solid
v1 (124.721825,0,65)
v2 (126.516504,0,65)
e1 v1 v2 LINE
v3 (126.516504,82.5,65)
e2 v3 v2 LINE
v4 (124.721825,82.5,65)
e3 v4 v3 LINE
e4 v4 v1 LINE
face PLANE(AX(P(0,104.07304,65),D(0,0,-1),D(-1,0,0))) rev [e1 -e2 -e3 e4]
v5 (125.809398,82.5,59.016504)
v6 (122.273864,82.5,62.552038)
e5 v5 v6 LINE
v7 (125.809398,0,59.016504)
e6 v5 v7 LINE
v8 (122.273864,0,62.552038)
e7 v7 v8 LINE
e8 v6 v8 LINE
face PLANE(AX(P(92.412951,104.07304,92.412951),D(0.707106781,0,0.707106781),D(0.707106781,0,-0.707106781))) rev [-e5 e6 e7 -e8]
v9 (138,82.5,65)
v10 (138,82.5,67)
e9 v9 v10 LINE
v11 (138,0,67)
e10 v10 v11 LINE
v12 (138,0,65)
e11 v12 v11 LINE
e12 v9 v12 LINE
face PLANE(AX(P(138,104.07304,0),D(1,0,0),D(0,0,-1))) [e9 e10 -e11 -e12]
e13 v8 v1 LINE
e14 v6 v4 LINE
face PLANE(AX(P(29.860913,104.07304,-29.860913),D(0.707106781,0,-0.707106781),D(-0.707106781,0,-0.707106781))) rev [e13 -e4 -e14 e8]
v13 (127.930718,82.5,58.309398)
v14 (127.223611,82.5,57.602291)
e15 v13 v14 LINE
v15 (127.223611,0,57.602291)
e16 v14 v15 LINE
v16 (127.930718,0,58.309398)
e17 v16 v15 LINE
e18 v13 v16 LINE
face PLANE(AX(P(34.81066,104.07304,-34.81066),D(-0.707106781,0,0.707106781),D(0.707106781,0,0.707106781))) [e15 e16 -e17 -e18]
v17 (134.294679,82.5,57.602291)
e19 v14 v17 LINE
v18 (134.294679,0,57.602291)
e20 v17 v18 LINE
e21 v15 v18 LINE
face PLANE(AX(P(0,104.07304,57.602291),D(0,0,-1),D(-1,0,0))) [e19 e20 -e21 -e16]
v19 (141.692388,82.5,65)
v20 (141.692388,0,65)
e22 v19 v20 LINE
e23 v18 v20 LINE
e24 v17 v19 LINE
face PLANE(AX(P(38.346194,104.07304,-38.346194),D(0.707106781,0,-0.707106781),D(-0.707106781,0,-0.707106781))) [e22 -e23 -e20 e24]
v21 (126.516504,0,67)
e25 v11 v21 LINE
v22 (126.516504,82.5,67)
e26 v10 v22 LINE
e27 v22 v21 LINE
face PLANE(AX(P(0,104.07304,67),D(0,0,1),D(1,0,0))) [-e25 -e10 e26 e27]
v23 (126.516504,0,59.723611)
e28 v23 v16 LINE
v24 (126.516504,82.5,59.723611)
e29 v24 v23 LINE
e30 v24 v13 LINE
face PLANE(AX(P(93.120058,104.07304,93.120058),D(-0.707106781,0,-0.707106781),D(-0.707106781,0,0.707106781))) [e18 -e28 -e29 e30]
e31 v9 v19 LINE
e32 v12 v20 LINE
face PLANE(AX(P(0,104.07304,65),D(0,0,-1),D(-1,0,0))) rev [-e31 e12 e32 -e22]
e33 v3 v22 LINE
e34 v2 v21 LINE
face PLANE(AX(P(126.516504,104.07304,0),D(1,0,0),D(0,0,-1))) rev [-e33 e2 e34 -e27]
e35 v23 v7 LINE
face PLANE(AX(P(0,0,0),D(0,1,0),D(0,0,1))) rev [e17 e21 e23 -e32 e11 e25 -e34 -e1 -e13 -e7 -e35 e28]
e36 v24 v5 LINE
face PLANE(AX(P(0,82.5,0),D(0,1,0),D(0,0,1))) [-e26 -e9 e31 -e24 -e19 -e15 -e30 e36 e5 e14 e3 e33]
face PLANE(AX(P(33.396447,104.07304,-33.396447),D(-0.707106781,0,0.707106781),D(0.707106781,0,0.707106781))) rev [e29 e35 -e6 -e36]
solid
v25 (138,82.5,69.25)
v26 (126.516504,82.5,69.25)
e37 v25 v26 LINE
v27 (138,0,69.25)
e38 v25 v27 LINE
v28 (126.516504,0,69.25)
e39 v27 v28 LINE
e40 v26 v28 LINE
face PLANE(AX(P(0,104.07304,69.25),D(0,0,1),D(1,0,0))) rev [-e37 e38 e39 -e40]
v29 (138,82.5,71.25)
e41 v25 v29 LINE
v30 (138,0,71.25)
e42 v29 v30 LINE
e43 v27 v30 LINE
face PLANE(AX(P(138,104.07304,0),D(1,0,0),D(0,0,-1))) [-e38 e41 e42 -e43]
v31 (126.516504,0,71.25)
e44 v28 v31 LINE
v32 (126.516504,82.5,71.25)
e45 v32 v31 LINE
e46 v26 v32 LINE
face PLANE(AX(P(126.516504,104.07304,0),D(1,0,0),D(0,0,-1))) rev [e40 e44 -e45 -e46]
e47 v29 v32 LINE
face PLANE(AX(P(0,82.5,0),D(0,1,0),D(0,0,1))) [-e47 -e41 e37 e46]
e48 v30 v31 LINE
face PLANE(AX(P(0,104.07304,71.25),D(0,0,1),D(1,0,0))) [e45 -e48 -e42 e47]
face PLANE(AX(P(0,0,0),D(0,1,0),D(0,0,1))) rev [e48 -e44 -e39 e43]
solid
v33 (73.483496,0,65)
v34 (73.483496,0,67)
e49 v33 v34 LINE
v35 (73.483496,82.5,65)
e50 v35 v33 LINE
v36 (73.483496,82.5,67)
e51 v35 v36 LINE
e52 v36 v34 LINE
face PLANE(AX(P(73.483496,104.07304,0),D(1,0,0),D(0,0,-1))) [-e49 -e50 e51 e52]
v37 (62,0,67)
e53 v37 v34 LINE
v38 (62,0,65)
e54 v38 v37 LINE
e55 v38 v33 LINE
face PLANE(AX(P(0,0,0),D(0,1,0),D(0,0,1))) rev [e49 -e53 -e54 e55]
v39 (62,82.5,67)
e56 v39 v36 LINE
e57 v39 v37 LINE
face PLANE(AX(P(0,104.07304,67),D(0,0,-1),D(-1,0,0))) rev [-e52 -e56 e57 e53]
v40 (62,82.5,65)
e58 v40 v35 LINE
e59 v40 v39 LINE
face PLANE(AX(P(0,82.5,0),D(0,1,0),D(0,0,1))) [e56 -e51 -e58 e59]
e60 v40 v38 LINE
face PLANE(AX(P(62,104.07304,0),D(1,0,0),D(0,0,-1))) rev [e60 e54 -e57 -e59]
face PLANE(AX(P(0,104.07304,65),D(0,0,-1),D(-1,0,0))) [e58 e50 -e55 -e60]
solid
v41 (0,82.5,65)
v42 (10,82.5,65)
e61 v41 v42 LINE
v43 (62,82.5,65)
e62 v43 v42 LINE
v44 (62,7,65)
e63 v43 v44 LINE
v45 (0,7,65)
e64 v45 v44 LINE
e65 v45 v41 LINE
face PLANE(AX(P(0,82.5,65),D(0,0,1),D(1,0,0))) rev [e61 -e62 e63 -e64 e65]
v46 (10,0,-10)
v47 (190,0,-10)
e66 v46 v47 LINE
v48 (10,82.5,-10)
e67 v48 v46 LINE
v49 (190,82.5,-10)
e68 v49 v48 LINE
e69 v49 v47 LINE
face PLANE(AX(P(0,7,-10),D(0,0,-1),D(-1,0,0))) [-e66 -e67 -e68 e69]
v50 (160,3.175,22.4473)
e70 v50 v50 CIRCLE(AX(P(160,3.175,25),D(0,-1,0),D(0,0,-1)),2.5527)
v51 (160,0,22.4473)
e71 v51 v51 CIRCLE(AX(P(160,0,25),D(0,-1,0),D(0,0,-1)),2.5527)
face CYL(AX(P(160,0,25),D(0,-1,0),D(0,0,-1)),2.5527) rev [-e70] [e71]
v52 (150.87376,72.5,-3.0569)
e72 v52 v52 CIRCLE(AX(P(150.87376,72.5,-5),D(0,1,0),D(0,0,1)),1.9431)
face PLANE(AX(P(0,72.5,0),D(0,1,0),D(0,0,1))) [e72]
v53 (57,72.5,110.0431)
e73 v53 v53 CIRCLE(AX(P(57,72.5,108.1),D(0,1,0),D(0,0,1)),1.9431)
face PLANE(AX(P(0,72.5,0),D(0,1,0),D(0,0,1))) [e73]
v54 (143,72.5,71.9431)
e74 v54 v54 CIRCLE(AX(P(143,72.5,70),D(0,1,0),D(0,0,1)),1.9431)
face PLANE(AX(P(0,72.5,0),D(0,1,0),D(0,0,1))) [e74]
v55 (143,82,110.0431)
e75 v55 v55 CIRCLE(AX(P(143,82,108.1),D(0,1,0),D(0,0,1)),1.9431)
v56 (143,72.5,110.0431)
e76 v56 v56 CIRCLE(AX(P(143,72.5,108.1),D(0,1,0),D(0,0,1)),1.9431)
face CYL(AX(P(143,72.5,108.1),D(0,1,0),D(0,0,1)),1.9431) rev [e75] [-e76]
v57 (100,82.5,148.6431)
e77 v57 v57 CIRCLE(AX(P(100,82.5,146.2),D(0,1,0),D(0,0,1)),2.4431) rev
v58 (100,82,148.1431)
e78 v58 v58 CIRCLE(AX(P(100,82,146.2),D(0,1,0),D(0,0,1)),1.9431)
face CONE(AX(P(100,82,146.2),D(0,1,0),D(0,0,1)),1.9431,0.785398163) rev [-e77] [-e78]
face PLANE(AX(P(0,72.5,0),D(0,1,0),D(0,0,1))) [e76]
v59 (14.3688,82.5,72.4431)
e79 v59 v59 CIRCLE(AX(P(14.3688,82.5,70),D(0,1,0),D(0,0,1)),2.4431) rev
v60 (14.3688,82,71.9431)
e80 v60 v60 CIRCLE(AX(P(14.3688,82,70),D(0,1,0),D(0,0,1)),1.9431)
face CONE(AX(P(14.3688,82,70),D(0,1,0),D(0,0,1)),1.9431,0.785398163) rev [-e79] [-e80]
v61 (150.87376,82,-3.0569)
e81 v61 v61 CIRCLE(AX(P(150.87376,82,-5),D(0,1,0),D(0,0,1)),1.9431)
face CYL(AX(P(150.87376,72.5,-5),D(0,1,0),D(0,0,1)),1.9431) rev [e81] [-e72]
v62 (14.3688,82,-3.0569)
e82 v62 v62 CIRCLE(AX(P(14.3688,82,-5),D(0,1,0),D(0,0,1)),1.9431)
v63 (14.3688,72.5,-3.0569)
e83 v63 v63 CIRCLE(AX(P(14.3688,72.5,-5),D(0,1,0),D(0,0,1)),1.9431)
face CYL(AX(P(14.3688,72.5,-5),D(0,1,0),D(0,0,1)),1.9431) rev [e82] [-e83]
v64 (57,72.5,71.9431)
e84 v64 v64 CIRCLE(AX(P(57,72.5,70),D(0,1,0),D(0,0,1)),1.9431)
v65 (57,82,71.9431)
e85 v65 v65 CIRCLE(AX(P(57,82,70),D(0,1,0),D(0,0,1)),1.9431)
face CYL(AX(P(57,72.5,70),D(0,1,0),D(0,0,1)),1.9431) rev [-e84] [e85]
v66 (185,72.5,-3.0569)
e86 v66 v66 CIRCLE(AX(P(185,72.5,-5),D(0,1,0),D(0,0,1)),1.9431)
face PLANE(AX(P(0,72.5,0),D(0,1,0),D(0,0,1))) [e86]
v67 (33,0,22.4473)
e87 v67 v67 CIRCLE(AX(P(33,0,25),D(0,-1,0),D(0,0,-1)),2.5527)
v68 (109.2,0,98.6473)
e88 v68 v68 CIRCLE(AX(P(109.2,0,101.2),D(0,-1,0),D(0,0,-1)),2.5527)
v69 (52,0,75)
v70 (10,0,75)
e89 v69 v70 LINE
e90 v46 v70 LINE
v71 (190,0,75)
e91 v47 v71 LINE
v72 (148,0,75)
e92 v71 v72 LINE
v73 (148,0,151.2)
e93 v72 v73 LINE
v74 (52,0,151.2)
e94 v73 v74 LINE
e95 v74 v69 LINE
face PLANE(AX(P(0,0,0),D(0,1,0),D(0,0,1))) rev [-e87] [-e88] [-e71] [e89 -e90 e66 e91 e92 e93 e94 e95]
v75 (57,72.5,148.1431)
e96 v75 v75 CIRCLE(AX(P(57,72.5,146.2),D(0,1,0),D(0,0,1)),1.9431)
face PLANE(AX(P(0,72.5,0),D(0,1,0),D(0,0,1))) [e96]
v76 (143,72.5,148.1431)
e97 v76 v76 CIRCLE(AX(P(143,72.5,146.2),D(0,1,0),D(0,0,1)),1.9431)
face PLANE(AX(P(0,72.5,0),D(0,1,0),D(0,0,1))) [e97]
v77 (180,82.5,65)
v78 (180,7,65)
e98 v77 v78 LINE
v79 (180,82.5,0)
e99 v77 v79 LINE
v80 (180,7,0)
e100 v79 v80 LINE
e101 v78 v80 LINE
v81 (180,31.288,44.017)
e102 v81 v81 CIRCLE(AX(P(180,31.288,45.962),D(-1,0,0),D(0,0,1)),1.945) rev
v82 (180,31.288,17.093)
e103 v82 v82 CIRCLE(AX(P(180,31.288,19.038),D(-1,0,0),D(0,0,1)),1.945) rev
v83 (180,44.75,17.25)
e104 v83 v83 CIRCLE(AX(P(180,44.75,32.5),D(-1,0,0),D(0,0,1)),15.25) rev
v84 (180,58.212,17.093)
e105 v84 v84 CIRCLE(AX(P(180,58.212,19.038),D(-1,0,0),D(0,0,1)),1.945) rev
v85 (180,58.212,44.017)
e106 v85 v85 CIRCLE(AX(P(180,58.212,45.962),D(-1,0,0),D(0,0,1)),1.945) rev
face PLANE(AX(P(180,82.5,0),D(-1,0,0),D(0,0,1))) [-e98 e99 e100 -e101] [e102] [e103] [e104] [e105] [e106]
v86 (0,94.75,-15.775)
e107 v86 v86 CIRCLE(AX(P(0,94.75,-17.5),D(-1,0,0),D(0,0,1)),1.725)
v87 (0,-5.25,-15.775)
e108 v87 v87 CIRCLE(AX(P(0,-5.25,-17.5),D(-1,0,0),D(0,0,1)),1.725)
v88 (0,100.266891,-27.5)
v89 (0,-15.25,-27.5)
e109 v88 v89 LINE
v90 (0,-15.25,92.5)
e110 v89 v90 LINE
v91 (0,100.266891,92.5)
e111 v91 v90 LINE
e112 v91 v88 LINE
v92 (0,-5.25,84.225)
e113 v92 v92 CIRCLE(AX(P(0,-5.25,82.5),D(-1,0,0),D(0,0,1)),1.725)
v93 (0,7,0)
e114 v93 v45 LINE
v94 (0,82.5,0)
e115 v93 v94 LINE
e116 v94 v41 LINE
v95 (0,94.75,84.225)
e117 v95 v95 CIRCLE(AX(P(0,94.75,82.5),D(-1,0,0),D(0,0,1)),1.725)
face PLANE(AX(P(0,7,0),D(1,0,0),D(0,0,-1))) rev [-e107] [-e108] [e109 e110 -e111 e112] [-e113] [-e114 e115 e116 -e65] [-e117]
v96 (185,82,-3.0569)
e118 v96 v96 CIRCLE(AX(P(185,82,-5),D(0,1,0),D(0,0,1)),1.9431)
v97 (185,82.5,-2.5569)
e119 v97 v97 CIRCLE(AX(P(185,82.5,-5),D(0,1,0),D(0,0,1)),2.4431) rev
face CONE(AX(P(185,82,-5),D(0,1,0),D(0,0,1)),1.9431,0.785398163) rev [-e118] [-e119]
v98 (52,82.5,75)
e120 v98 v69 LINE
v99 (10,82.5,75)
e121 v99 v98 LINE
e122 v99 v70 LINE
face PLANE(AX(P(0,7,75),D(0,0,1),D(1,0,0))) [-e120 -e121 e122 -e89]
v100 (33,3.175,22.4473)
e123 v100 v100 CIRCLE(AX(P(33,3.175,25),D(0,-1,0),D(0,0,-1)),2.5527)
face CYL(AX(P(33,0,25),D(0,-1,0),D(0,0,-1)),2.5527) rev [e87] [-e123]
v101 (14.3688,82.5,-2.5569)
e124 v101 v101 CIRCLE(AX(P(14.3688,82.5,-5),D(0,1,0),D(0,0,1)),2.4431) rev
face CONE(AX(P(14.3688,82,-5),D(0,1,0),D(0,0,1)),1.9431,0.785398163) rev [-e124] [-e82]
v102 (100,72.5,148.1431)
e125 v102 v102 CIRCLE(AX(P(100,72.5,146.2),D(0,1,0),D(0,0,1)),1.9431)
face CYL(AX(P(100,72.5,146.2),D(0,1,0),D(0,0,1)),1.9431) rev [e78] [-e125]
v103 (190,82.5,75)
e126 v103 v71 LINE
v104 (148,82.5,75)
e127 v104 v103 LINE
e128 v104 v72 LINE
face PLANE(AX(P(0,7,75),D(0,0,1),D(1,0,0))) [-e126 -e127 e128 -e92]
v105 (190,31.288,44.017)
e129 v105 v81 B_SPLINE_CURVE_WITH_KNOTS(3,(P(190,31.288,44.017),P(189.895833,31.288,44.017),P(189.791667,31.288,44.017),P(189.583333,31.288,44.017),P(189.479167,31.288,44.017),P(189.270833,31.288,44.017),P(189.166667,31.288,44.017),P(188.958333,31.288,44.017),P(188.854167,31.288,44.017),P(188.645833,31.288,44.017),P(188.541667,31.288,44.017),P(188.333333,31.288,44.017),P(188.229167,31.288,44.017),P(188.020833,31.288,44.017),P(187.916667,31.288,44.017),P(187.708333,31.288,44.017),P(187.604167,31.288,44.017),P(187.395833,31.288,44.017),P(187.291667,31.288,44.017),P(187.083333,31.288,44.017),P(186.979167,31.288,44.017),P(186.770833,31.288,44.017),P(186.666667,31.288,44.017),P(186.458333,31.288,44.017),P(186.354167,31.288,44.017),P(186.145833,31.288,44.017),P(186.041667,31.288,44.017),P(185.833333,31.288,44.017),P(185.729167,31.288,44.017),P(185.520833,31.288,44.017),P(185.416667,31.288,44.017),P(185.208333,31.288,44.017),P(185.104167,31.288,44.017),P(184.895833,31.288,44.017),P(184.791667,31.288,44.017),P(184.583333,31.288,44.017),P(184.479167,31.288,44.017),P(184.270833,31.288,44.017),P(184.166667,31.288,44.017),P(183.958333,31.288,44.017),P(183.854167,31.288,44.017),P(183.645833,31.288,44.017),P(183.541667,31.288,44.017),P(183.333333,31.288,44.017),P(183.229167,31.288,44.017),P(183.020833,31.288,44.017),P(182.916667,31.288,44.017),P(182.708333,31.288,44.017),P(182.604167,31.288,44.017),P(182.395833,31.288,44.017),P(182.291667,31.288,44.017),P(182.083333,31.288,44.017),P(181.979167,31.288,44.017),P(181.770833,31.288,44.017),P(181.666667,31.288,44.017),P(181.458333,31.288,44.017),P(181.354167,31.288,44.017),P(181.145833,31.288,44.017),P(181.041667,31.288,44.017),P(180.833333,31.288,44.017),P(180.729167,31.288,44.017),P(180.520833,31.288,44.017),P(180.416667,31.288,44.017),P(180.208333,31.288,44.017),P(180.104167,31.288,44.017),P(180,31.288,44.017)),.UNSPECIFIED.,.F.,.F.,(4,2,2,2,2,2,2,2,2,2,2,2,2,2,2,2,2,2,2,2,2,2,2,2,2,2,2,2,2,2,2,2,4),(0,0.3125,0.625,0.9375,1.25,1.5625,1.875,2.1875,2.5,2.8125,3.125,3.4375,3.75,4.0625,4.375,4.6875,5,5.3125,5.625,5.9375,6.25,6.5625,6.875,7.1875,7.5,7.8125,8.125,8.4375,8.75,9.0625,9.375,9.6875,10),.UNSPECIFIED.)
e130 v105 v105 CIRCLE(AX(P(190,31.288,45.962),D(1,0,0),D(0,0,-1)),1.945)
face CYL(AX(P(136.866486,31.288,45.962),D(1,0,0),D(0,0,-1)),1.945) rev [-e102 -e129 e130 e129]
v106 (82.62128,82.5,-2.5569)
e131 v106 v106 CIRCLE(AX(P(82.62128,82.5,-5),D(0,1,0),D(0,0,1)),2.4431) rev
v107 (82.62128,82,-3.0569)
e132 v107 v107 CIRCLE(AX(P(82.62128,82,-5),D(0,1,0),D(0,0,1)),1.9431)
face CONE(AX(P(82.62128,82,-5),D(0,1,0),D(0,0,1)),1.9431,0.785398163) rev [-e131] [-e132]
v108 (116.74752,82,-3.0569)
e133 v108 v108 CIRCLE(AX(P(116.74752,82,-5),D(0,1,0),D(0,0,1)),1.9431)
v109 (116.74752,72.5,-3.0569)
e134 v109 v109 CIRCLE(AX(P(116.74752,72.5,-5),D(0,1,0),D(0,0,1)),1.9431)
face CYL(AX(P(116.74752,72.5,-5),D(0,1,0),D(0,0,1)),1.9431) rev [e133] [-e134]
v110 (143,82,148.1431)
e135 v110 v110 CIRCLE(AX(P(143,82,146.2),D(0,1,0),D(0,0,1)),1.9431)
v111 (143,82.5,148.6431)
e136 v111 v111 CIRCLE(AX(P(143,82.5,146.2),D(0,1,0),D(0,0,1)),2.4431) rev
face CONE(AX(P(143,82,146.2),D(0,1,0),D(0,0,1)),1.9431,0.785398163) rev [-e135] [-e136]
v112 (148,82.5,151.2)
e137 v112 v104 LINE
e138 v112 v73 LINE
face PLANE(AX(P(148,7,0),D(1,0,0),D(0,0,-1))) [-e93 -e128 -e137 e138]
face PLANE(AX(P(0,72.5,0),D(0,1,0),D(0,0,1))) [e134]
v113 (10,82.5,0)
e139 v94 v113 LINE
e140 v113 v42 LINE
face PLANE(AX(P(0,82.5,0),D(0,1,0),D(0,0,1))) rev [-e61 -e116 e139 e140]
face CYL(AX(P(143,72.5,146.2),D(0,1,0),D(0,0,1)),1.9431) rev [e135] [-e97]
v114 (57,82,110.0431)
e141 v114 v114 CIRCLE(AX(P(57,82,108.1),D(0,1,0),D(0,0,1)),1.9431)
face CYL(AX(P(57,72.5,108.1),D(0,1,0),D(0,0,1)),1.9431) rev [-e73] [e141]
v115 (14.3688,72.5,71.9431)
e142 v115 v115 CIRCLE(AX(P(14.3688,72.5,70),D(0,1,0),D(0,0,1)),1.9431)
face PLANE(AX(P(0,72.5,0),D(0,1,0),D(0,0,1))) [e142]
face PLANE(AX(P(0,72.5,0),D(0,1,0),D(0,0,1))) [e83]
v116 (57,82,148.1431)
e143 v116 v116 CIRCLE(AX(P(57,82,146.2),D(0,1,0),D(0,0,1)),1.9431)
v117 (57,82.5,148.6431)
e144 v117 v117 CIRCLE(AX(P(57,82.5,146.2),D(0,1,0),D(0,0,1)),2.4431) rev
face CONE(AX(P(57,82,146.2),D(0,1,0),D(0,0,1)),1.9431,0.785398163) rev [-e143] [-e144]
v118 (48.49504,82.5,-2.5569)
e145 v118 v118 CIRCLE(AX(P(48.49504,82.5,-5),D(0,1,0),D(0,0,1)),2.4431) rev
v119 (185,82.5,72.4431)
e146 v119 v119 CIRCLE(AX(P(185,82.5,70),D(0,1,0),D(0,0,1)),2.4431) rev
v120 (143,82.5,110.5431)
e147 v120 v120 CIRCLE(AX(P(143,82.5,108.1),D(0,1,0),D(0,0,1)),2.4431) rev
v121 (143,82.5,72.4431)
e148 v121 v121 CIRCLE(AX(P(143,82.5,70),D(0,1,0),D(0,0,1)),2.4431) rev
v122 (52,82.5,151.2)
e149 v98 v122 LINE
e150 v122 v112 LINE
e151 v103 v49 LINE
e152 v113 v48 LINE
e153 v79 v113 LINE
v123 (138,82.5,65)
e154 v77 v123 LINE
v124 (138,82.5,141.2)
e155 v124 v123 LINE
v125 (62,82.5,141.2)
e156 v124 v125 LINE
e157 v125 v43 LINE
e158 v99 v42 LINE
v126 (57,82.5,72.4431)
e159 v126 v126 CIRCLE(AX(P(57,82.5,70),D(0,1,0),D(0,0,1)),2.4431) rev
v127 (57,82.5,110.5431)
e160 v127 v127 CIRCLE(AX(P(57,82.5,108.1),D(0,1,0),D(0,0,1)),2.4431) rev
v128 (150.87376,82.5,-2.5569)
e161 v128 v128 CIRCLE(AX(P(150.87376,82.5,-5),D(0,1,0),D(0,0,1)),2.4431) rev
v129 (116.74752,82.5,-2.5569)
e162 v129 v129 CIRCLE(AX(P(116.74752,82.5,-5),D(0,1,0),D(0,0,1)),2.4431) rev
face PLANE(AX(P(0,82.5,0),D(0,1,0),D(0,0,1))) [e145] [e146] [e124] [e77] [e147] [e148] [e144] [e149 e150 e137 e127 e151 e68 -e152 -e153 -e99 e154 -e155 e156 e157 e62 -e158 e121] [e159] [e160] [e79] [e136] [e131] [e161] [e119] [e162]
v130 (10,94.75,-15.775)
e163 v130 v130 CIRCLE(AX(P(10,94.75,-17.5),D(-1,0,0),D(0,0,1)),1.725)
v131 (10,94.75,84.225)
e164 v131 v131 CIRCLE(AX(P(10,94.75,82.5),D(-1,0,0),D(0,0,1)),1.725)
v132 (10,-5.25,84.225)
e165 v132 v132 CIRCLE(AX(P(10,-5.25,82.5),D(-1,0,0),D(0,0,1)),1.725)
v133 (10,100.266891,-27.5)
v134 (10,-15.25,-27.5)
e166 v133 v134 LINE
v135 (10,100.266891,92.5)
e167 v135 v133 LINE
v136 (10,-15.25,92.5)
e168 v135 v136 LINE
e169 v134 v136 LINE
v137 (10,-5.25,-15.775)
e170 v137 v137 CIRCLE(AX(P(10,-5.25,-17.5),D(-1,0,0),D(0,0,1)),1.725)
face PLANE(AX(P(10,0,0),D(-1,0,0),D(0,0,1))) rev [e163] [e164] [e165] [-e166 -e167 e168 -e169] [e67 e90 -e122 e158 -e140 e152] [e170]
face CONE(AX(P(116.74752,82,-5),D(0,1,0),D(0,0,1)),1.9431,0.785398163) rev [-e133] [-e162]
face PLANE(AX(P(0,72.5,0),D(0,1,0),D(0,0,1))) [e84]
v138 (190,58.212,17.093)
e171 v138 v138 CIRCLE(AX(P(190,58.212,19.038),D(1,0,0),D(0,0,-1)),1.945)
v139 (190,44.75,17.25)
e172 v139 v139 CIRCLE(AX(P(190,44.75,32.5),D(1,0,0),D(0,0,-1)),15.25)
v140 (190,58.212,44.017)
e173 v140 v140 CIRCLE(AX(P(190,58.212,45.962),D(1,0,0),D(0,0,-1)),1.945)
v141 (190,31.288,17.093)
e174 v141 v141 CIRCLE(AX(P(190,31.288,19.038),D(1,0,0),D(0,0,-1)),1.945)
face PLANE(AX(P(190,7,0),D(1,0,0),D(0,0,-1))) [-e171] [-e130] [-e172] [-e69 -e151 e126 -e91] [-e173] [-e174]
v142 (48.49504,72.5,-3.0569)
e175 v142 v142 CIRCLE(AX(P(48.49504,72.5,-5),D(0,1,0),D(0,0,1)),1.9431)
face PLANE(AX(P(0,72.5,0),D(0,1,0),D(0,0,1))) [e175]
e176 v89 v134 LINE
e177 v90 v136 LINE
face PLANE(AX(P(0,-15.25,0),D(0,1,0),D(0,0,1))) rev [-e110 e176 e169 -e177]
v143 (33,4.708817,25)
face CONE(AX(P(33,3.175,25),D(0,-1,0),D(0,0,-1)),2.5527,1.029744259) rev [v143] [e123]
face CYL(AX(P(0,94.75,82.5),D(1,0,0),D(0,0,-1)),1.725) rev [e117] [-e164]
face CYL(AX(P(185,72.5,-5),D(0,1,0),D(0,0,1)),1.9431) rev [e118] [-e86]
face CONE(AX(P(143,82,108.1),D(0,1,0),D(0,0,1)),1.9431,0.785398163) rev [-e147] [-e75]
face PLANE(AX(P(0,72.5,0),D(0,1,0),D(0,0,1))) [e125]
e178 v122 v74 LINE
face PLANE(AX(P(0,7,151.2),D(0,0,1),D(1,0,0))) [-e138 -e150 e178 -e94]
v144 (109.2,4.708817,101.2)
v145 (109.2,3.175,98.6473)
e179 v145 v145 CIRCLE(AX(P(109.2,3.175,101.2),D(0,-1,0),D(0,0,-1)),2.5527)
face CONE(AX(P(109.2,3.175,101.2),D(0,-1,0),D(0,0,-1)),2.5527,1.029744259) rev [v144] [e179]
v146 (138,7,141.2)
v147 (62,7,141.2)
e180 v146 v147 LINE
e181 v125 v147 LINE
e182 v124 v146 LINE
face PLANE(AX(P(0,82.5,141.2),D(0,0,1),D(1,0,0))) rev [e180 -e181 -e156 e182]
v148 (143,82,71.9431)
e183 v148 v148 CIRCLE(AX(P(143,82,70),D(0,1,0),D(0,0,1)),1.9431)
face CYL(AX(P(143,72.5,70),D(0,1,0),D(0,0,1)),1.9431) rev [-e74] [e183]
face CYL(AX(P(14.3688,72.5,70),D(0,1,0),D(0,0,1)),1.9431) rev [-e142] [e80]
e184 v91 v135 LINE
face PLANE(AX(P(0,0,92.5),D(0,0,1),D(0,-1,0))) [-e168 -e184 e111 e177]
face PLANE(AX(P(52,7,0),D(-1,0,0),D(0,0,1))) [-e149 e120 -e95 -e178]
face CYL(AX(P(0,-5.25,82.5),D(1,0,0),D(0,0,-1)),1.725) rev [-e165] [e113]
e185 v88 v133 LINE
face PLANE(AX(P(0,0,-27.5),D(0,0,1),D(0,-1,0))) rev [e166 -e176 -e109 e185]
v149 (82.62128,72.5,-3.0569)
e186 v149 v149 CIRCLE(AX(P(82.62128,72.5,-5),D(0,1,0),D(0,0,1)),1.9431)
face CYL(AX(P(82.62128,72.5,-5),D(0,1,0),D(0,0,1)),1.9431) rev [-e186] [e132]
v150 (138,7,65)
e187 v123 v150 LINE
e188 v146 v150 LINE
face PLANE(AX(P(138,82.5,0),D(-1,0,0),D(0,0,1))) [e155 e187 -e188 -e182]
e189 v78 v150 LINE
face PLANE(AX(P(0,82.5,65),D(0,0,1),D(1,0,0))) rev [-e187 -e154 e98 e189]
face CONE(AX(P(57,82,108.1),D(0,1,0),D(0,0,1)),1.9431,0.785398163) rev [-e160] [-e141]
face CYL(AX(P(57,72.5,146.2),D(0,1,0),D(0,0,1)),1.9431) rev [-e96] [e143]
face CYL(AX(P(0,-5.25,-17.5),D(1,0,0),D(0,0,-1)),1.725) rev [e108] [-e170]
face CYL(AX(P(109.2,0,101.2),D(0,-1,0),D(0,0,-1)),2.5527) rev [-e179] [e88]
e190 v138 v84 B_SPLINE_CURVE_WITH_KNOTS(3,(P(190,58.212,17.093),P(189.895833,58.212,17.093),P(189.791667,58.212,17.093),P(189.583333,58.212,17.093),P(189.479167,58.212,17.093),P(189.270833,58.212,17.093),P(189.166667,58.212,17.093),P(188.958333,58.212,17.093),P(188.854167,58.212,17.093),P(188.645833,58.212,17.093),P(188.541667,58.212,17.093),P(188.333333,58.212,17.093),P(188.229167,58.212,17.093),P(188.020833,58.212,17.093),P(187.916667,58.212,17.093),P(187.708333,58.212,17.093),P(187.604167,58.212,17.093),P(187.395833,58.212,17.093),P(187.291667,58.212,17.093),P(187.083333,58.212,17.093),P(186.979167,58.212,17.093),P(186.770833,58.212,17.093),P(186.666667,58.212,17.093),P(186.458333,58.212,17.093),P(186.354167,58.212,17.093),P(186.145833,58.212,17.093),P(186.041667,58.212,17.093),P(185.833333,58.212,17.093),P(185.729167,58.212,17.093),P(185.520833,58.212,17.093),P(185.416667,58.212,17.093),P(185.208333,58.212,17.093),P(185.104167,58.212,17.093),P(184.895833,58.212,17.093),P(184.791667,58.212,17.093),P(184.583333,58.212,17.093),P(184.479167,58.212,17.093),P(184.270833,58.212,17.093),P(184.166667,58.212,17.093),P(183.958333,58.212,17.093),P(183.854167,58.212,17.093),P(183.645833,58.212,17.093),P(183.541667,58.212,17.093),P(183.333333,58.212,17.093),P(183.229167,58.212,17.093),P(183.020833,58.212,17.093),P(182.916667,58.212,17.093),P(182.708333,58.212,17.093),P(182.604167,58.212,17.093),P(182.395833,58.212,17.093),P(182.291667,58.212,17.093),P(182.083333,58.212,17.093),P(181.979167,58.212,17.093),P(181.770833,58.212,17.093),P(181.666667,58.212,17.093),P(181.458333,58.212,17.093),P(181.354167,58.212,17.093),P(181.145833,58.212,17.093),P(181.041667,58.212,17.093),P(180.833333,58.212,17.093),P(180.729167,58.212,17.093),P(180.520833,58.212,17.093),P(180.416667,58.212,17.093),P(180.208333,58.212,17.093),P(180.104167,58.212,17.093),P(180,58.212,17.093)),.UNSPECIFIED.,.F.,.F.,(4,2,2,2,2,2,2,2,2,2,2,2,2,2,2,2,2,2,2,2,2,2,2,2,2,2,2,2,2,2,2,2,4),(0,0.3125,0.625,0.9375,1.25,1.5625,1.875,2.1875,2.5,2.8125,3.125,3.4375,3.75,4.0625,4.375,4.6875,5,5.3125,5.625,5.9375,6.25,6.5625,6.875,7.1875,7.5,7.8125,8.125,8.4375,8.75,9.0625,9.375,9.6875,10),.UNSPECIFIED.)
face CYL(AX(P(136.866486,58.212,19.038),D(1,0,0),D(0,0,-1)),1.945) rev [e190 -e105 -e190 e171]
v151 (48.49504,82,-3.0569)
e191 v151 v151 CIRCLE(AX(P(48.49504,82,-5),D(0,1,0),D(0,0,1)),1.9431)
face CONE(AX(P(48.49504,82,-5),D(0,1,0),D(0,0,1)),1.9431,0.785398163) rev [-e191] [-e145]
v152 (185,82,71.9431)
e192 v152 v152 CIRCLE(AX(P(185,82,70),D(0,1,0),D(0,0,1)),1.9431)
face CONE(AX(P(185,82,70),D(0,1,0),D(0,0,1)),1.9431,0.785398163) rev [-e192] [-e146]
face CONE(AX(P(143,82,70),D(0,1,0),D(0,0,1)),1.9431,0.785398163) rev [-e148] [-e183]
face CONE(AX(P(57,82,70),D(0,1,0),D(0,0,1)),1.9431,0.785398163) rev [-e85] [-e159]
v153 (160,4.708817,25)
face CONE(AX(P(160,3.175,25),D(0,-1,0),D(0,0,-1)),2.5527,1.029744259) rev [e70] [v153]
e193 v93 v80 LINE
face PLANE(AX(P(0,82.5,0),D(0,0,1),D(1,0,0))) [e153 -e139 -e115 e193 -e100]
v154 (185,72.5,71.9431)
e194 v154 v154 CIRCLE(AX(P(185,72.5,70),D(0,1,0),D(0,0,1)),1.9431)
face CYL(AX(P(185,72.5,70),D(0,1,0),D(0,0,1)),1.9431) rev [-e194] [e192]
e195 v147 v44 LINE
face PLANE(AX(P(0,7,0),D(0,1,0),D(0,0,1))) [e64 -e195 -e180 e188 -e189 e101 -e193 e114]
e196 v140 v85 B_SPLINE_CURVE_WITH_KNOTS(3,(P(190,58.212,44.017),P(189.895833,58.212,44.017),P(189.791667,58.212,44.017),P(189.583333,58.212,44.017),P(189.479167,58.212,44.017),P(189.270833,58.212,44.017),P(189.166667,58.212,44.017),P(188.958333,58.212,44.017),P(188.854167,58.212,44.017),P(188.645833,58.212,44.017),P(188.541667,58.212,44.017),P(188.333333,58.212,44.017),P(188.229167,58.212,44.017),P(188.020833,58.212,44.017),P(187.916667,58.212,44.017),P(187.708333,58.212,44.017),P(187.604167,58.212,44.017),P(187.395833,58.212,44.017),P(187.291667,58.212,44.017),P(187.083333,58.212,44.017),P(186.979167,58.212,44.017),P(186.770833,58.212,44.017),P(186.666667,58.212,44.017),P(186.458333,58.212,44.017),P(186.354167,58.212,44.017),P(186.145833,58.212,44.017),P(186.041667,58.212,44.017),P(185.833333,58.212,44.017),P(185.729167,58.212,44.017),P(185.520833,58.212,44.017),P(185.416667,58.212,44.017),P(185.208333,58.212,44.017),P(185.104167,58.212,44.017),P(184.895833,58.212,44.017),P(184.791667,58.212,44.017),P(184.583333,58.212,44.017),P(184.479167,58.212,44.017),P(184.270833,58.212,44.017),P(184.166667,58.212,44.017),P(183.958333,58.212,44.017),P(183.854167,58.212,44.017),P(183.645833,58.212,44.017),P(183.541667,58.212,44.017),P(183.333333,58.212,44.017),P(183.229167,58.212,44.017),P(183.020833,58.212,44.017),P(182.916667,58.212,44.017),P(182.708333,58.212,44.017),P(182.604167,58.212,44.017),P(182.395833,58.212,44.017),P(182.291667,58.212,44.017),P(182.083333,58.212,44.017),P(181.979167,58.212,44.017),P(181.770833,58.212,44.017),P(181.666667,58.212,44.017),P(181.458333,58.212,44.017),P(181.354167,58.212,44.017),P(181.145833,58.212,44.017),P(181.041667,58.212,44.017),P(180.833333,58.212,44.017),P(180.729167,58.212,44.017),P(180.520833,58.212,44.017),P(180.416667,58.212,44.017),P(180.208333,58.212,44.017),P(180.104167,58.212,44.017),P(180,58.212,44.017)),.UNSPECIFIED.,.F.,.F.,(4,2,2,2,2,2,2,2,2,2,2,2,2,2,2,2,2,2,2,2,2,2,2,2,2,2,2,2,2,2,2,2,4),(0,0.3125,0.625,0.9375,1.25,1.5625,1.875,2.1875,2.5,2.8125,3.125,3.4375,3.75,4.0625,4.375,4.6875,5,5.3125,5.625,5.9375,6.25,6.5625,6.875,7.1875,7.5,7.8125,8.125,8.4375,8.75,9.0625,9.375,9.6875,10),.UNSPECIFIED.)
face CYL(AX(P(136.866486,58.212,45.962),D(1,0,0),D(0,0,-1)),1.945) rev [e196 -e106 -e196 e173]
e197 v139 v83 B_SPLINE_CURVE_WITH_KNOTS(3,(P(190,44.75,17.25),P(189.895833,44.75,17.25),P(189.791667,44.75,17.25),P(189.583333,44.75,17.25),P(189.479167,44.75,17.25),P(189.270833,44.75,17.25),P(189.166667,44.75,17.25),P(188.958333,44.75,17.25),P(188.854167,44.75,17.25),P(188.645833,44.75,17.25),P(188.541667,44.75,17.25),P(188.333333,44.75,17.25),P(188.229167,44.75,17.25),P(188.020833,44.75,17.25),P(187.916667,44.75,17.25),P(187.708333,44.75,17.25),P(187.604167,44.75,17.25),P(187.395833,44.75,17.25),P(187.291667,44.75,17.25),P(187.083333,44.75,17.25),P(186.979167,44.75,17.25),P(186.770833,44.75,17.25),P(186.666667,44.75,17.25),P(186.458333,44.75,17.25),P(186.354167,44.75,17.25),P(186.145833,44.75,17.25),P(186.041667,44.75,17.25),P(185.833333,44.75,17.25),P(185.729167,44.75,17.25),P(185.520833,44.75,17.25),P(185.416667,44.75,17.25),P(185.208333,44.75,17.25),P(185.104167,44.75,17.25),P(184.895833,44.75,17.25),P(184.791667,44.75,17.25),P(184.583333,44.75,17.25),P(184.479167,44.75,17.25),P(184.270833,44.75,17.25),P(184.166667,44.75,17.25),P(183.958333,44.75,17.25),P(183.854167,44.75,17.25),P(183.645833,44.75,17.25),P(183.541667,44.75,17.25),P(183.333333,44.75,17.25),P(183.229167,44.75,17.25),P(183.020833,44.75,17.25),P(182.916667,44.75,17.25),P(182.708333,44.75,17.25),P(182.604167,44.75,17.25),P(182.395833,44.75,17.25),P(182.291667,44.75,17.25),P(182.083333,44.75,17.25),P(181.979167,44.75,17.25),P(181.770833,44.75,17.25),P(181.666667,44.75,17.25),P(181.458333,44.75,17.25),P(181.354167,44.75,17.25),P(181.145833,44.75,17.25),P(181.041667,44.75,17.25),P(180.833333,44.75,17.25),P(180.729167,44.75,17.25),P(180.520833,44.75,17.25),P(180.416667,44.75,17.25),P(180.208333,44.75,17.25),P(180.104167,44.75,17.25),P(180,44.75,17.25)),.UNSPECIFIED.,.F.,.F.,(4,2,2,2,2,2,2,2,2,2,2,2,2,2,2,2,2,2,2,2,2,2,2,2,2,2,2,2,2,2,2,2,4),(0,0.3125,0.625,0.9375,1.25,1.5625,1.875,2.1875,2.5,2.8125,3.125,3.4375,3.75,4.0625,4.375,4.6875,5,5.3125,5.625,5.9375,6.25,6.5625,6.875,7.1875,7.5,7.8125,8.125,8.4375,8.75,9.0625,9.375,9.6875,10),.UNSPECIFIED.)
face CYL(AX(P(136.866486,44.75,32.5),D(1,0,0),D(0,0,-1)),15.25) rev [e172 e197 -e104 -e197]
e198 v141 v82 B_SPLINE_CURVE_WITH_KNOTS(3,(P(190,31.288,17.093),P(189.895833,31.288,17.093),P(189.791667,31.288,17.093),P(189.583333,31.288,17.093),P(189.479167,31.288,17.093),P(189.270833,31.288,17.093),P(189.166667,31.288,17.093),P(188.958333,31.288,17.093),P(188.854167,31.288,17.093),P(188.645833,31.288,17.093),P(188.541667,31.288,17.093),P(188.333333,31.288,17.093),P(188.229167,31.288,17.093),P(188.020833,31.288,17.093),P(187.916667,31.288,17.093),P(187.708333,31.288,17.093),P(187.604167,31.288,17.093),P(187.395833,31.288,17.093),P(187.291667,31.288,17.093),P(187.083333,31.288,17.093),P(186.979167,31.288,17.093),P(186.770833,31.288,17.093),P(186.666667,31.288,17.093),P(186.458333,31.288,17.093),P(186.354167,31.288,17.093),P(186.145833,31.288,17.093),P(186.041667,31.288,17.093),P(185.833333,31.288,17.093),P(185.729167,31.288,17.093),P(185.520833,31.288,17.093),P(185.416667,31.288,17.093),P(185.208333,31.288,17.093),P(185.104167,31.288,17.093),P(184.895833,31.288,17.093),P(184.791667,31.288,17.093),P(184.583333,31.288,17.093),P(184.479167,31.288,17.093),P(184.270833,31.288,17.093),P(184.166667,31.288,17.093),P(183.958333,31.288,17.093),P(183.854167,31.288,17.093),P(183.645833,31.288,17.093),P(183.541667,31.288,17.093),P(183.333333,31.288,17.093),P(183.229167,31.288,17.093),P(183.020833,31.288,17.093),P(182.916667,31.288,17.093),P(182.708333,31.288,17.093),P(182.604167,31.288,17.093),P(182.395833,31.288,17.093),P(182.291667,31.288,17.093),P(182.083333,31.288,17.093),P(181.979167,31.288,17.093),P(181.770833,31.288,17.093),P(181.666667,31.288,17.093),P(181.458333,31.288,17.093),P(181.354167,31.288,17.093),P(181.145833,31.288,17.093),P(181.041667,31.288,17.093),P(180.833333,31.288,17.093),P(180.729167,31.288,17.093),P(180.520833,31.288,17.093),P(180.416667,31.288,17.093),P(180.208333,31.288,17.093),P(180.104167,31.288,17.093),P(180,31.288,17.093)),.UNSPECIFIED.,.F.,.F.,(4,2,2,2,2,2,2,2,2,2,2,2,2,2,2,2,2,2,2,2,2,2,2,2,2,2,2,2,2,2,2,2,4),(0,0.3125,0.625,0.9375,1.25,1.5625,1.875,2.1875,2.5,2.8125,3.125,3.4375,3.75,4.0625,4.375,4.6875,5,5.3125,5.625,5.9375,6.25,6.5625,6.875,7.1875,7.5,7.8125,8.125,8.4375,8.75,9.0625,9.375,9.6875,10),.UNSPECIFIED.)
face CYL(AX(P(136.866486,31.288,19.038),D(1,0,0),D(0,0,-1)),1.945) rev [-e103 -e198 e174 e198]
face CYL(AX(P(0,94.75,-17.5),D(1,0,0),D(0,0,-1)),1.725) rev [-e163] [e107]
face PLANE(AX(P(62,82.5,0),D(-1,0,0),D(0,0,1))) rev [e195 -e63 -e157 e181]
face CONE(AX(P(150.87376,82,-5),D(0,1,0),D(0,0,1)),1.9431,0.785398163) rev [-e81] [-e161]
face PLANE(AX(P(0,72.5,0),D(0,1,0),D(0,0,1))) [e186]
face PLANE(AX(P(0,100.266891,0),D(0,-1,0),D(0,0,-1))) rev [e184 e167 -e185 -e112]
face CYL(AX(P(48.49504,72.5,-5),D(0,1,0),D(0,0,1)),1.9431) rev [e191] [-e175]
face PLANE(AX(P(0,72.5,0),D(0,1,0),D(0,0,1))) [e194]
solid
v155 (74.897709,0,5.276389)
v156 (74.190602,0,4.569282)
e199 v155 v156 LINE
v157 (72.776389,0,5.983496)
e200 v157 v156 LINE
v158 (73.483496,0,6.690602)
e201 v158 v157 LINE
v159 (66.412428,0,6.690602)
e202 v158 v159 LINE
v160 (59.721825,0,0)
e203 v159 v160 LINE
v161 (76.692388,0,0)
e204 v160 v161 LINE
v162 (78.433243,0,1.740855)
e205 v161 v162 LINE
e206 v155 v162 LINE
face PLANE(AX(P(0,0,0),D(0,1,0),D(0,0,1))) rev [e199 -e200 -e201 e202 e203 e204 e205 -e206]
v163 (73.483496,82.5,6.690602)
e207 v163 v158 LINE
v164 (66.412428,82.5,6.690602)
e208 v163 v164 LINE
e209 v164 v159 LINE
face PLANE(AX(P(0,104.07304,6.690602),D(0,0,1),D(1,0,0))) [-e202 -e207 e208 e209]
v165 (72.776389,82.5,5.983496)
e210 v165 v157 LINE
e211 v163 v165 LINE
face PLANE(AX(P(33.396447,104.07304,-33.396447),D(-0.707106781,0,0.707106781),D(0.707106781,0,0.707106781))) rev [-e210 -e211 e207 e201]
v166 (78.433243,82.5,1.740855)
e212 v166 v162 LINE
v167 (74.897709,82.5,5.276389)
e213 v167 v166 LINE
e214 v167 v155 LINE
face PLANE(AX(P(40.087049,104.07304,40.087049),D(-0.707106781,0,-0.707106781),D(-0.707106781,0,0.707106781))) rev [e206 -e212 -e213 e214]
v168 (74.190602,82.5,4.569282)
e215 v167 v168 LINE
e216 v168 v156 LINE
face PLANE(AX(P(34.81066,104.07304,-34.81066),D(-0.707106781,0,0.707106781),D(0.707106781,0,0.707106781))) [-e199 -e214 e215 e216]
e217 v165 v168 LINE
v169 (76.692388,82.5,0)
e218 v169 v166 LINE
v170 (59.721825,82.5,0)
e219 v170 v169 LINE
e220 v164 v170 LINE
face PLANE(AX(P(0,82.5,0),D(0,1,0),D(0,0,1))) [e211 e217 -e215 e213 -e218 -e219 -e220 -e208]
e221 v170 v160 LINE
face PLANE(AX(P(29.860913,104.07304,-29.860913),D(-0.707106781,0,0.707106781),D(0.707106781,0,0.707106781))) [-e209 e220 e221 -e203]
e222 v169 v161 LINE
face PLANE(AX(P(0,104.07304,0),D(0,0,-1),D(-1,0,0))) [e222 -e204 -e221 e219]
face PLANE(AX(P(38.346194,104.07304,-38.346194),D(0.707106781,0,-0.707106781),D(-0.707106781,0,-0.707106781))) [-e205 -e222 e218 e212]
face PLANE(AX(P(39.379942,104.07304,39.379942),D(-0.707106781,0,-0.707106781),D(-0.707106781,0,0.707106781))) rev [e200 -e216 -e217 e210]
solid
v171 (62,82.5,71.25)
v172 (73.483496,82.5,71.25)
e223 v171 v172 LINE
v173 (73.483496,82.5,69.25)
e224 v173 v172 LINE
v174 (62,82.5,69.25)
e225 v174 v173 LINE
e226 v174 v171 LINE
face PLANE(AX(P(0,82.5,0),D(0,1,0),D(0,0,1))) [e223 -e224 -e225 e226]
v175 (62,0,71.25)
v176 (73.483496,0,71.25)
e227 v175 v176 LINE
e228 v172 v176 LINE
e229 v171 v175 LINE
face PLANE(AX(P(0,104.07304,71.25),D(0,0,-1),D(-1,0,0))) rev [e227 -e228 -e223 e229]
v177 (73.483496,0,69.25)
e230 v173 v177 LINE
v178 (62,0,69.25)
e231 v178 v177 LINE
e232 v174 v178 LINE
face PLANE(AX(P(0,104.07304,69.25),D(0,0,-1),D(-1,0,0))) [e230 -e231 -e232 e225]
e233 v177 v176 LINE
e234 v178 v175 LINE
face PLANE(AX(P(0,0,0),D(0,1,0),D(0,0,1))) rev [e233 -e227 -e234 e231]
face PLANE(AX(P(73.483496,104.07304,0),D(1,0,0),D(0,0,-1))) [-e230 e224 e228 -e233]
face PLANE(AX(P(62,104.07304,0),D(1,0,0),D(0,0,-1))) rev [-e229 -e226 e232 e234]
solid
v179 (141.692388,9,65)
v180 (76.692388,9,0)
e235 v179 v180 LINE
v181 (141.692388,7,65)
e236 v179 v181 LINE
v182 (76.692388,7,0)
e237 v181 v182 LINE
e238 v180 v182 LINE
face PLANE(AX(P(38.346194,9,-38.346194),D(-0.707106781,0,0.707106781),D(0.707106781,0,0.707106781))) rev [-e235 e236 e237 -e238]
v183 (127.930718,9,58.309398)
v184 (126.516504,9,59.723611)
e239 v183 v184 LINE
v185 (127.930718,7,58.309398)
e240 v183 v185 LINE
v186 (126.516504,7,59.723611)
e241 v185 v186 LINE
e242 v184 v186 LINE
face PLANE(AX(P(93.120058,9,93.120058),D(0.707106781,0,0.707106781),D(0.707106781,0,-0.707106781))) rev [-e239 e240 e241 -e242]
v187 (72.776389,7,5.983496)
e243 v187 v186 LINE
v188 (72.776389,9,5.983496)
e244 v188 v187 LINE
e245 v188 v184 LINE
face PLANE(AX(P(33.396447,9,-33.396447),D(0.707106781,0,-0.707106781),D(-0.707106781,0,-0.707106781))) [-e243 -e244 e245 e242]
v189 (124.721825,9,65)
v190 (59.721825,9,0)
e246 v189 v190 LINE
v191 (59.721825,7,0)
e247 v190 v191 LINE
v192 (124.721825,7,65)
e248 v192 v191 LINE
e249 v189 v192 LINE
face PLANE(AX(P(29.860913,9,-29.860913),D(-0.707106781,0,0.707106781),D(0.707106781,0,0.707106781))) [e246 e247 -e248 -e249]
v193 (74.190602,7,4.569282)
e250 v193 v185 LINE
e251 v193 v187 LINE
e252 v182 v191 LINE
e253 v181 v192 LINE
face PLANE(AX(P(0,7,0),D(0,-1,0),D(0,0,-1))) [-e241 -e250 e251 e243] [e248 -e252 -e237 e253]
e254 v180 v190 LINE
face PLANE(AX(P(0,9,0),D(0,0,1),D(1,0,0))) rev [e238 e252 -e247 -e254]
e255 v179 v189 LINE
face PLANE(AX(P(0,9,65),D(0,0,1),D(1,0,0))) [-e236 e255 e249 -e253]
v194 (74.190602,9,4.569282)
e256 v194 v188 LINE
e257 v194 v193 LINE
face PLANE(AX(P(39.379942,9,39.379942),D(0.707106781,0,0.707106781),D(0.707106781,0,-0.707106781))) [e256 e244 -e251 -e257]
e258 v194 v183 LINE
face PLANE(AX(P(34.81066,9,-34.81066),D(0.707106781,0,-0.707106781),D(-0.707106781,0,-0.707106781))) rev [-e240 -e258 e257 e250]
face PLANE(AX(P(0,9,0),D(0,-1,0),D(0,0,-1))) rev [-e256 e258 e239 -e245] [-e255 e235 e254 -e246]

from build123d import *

# Parameters (mm, degrees)
FLOOR_2_DEPTH                    = 7
WALLS_START                      = 52
WALLS_OUTLINE_W                  = 75.5
WALLS_OUTLINE_H                  = 10
WALLS_DEPTH                      = 96
WALLS_START_2                    = 10
WALLS_2_OUTLINE_W                = 75.5
WALLS_2_OUTLINE_H                = 10
WALLS_2_DEPTH                    = 52
WALLS_START_3                    = 138
WALLS_3_OUTLINE_W                = 75.5
WALLS_3_OUTLINE_H                = 10
WALLS_3_DEPTH                    = 52
WALLS_4_OUTLINE_W                = 75.5
WALLS_4_OUTLINE_H                = 66.2
WALLS_4_DEPTH                    = 10
WALLS_5_OUTLINE_W                = 75.5
WALLS_5_OUTLINE_H                = 66.2
WALLS_5_DEPTH                    = 10
WALLS_START_4                    = 180
WALLS_6_OUTLINE_W                = 75.5
WALLS_6_OUTLINE_H                = 65
WALLS_6_DEPTH                    = 10
OUTLINE_SKETCH_12_W              = 11.483495706
OUTLINE_SKETCH_12_H              = 2
VERTICAL_SUPPORTS_DEPTH          = 82.5
BEAM_START                       = 7
BEAM_SPLITTER_SUPPORTS_DEPTH     = 2
SM1_FLANGE_SKETCH_R              = 15.25
SM1_FLANGE_SKETCH_R_2            = 1.945
SM1_FLANGE_CUTOUT_DEPTH          = 10
CRYOSTAT_FLANGE_SKETCH_R         = 1.725
CRYOSTAT_FLANGE_SKETCH_W         = 65
CRYOSTAT_FLANGE_SKETCH_H         = 75.5
CRYSTAT_FLANGE_EXTRUSION_DEPTH   = 10
THREADED_INSERT_SKETCH_R         = 1.9431
CUT_EXTRUDE2_DEPTH               = 10
CHAMFER1_SIZE                    = 0.5
F_1_4_20_TAPPED_HOLE1_AT_2_COUNT = 2
F_1_4_20_TAPPED_HOLE1_AT_2_PITCH = 91.581002397
F_1_4_20_TAPPED_HOLE1_AT_3_COUNT = 2
F_1_4_20_TAPPED_HOLE1_AT_3_PITCH = 107.763073453


# Read off the part's stored shape, not the designer's step: Walls, Beam Splitter Supports
with BuildPart() as part:
    # Outline Sketch → Floor 2 (new body)
    with BuildSketch(Plane(origin=(0, 0, 0), x_dir=(1, 0, 0), z_dir=(0, 1, 0))):
        Polygon((10, -75), (52, -75), (52, -151.2), (148, -151.2), (148, -75), (190, -75), (190, 10), (10, 10), (10, 0), (0, 0), (0, -65), (10, -65), align=None)
    extrude(amount=FLOOR_2_DEPTH)

    # Walls outline → Walls (add)
    with BuildSketch(Plane.YZ.offset(WALLS_START)):
        with Locations((44.75, 146.2)):
            Rectangle(WALLS_OUTLINE_W, WALLS_OUTLINE_H)
        with Locations((44.75, -5)):
            Rectangle(WALLS_OUTLINE_W, WALLS_OUTLINE_H)
    extrude(amount=WALLS_DEPTH)

    # Walls 2 outline → Walls 2 (add)
    with BuildSketch(Plane.YZ.offset(WALLS_START_2)):
        with Locations((44.75, 70)):
            Rectangle(WALLS_2_OUTLINE_W, WALLS_2_OUTLINE_H)
        with Locations((44.75, -5)):
            Rectangle(WALLS_2_OUTLINE_W, WALLS_2_OUTLINE_H)
    extrude(amount=WALLS_2_DEPTH)

    # Walls 3 outline → Walls 3 (add)
    with BuildSketch(Plane.YZ.offset(WALLS_START_3)):
        with Locations((44.75, 70)):
            Rectangle(WALLS_3_OUTLINE_W, WALLS_3_OUTLINE_H)
        with Locations((44.75, -5)):
            Rectangle(WALLS_3_OUTLINE_W, WALLS_3_OUTLINE_H)
    extrude(amount=WALLS_3_DEPTH)

    # Walls 4 outline → Walls 4 (add)
    with BuildSketch(Plane.YZ.offset(WALLS_START)):
        with Locations((44.75, 108.1)):
            Rectangle(WALLS_4_OUTLINE_W, WALLS_4_OUTLINE_H)
    extrude(amount=WALLS_4_DEPTH)

    # Walls 5 outline → Walls 5 (add)
    with BuildSketch(Plane.YZ.offset(WALLS_START_3)):
        with Locations((44.75, 108.1)):
            Rectangle(WALLS_5_OUTLINE_W, WALLS_5_OUTLINE_H)
    extrude(amount=WALLS_5_DEPTH)

    # Walls 6 outline → Walls 6 (add)
    with BuildSketch(Plane.YZ.offset(WALLS_START_4)):
        with Locations((44.75, 32.5)):
            Rectangle(WALLS_6_OUTLINE_W, WALLS_6_OUTLINE_H)
    extrude(amount=WALLS_6_DEPTH)

    # SM1 Flange Sketch → SM1 Flange Cutout (cut)
    with BuildSketch(Plane(origin=(190, 0, 0), x_dir=(0, 0, -1), z_dir=(1, 0, 0))):
        with Locations((-32.5, 44.75)):
            Circle(SM1_FLANGE_SKETCH_R)
        with Locations((-45.962, 58.212)):
            Circle(SM1_FLANGE_SKETCH_R_2)
        with Locations((-19.038, 58.212)):
            Circle(SM1_FLANGE_SKETCH_R_2)
        with Locations((-19.038, 31.288)):
            Circle(SM1_FLANGE_SKETCH_R_2)
        with Locations((-45.962, 31.288)):
            Circle(SM1_FLANGE_SKETCH_R_2)
    extrude(amount=-SM1_FLANGE_CUTOUT_DEPTH, mode=Mode.SUBTRACT)

    # Cryostat Flange Sketch → Crystat Flange Extrusion (add)
    with BuildSketch(Plane.ZY.offset(-10)):
        Polygon((-18.300000062, 100.26689112), (-27.5, 100.26689112), (-27.5, -15.25), (92.5, -15.25), (92.5, 100.26689112), (83.3, 100.26689112), (57.9, 100.26689112), (32.5, 100.26689112), (7.100000012, 100.26689112), align=None)
        with Locations((-17.5, -5.25)):
            Circle(CRYOSTAT_FLANGE_SKETCH_R, mode=Mode.SUBTRACT)
        with Locations((82.5, -5.25)):
            Circle(CRYOSTAT_FLANGE_SKETCH_R, mode=Mode.SUBTRACT)
        with Locations((32.5, 44.75)):
            Rectangle(CRYOSTAT_FLANGE_SKETCH_W, CRYOSTAT_FLANGE_SKETCH_H, mode=Mode.SUBTRACT)
        with Locations((-17.5, 94.75)):
            Circle(CRYOSTAT_FLANGE_SKETCH_R, mode=Mode.SUBTRACT)
        with Locations((82.5, 94.75)):
            Circle(CRYOSTAT_FLANGE_SKETCH_R, mode=Mode.SUBTRACT)
    extrude(amount=CRYSTAT_FLANGE_EXTRUSION_DEPTH)

    # Threaded Insert Sketch → Cut-Extrude2 (cut)
    with BuildSketch(Plane(origin=(0, 82.5, 0), x_dir=(1, 0, 0), z_dir=(0, 1, 0))):
        with Locations(Location((14.3688, 5, 0), (0, 0, 270))):
            Circle(THREADED_INSERT_SKETCH_R)
        with Locations(Location((48.49504, 5, 0), (0, 0, 270))):
            Circle(THREADED_INSERT_SKETCH_R)
        with Locations(Location((82.62128, 5, 0), (0, 0, 270))):
            Circle(THREADED_INSERT_SKETCH_R)
        with Locations(Location((116.74752, 5, 0), (0, 0, 270))):
            Circle(THREADED_INSERT_SKETCH_R)
        with Locations(Location((185, 5, 0), (0, 0, 270))):
            Circle(THREADED_INSERT_SKETCH_R)
        with Locations(Location((150.87376, 5, 0), (0, 0, 270))):
            Circle(THREADED_INSERT_SKETCH_R)
        with Locations(Location((185, -70, 0), (0, 0, 270))):
            Circle(THREADED_INSERT_SKETCH_R)
        with Locations(Location((143, -70, 0), (0, 0, 270))):
            Circle(THREADED_INSERT_SKETCH_R)
        with Locations(Location((143, -108.1, 0), (0, 0, 270))):
            Circle(THREADED_INSERT_SKETCH_R)
        with Locations(Location((100, -146.2, 0), (0, 0, 270))):
            Circle(THREADED_INSERT_SKETCH_R)
        with Locations(Location((143, -146.2, 0), (0, 0, 270))):
            Circle(THREADED_INSERT_SKETCH_R)
        with Locations(Location((57, -146.2, 0), (0, 0, 270))):
            Circle(THREADED_INSERT_SKETCH_R)
        with Locations(Location((57, -108.1, 0), (0, 0, 270))):
            Circle(THREADED_INSERT_SKETCH_R)
        with Locations(Location((57, -70, 0), (0, 0, 270))):
            Circle(THREADED_INSERT_SKETCH_R)
        with Locations(Location((14.3688, -70, 0), (0, 0, 270))):
            Circle(THREADED_INSERT_SKETCH_R)
    extrude(amount=-CUT_EXTRUDE2_DEPTH, mode=Mode.SUBTRACT)

    # Chamfer1
    chamfer1_edges = [part.edges().sort_by_distance(p)[0] for p in [
        (143, 82.5, 106.1569),
        (143, 82.5, 68.0569),
        (185, 82.5, 68.0569),
        (150.87376, 82.5, -6.9431),
        (185, 82.5, -6.9431),
        (116.74752, 82.5, -6.9431),
        (82.62128, 82.5, -6.9431),
        (48.49504, 82.5, -6.9431),
        (100, 82.5, 144.2569),
        (143, 82.5, 144.2569),
        (57, 82.5, 144.2569),
        (57, 82.5, 106.1569),
        (57, 82.5, 68.0569),
        (14.3688, 82.5, 68.0569),
        (14.3688, 82.5, -6.9431),
    ]]
    chamfer(chamfer1_edges, length=CHAMFER1_SIZE)

    # Sketch10 → 1/4-20 Tapped Hole1 (revolve, cut)
    with BuildSketch(Plane(origin=(109.2, 0, 101.2), x_dir=(0, 0, -1), z_dir=(1, 0, 0))):
        Polygon((0, 0), (0, 4.708816902), (2.5527, 3.175), (2.5527, 0), align=None)
    f_1_4_20_tapped_hole1 = revolve(axis=Axis((109.2, -6.35, 101.2), (0, 1, 0)), mode=Mode.SUBTRACT)

    # 1/4-20 Tapped Hole1 at 2: 1/4-20 Tapped Hole1 ×2
    with Locations(*[Vector(0.5547001962252291, 0, -0.8320502943378437) * (i * F_1_4_20_TAPPED_HOLE1_AT_2_PITCH) for i in range(1, F_1_4_20_TAPPED_HOLE1_AT_2_COUNT)]):
        add(f_1_4_20_tapped_hole1, mode=Mode.SUBTRACT)

    # 1/4-20 Tapped Hole1 at 3: 1/4-20 Tapped Hole1 ×2
    with Locations(*[Vector(-0.7071067811865475, 0, -0.7071067811865476) * (i * F_1_4_20_TAPPED_HOLE1_AT_3_PITCH) for i in range(1, F_1_4_20_TAPPED_HOLE1_AT_3_COUNT)]):
        add(f_1_4_20_tapped_hole1, mode=Mode.SUBTRACT)


with BuildPart() as body_2:
    # Outline Sketch<12> → Vertical Supports (new body)
    with BuildSketch(Plane(origin=(0, 0, 0), x_dir=(1, 0, 0), z_dir=(0, 1, 0))):
        Polygon((63.257359313, -3.535533906), (66.792893219, 0), (59.721825407, 0), align=None)
        Polygon((73.483495706, -6.690602487), (72.776388924, -5.983495706), (66.792893219, 0), (63.257359313, -3.535533906), (66.412427894, -6.690602487), align=None)
        Polygon((69.621320344, 0), (73.156854249, -3.535533906), (76.692388155, 0), align=None)
        Polygon((74.190602487, -4.569282143), (73.156854249, -3.535533906), (69.621320344, 0), (66.792893219, 0), (72.776388924, -5.983495706), align=None)
        Polygon((76.692388155, 0), (73.156854249, -3.535533906), (74.190602487, -4.569282143), (77.726136393, -1.033748237), align=None)
        Polygon((77.726136393, -1.033748237), (74.190602487, -4.569282143), (74.897709268, -5.276388924), (78.433243174, -1.740855018), align=None)
        Polygon((126.516504294, -59.723611076), (125.809397513, -59.016504294), (122.273863607, -62.5520382), (124.721825407, -65), (128.257359313, -61.464466094), align=None)
        Polygon((134.621320344, -65), (127.930717857, -58.309397513), (126.516504294, -59.723611076), (128.257359313, -61.464466094), (131.792893219, -65), align=None)
        Polygon((134.294678888, -57.602290732), (127.223611076, -57.602290732), (127.930717857, -58.309397513), (134.621320344, -65), (138.156854249, -61.464466094), align=None)
        Polygon((138, -65), (141.692388155, -65), (138.156854249, -61.464466094), (134.621320344, -65), align=None)
        Polygon((126.516504294, -65), (131.792893219, -65), (128.257359313, -61.464466094), (124.721825407, -65), align=None)
        Polygon((138, -67), (138, -65), (134.621320344, -65), (131.792893219, -65), (126.516504294, -65), (126.516504294, -67), align=None)
        with Locations((132.258252147, -70.25)):
            Rectangle(OUTLINE_SKETCH_12_W, OUTLINE_SKETCH_12_H)
        with Locations((67.741747853, -66)):
            Rectangle(OUTLINE_SKETCH_12_W, OUTLINE_SKETCH_12_H)
        with Locations((67.741747853, -70.25)):
            Rectangle(OUTLINE_SKETCH_12_W, OUTLINE_SKETCH_12_H)
    extrude(amount=VERTICAL_SUPPORTS_DEPTH)


with BuildPart() as body_3:
    # Beam Splitter Supports outline → Beam Splitter Supports (new body)
    with BuildSketch(Plane(origin=(0, 0, 0), x_dir=(1, 0, 0), z_dir=(0, 1, 0)).offset(BEAM_START)):
        Polygon((59.721825407, 0), (124.721825407, -65), (141.692388155, -65), (76.692388155, 0), align=None)
        Polygon((74.190602487, -4.569282143), (127.930717857, -58.309397513), (126.516504294, -59.723611076), (72.776388924, -5.983495706), align=None, mode=Mode.SUBTRACT)
    extrude(amount=BEAM_SPLITTER_SUPPORTS_DEPTH)


solid = Compound([part.part, body_2.part, body_3.part])
